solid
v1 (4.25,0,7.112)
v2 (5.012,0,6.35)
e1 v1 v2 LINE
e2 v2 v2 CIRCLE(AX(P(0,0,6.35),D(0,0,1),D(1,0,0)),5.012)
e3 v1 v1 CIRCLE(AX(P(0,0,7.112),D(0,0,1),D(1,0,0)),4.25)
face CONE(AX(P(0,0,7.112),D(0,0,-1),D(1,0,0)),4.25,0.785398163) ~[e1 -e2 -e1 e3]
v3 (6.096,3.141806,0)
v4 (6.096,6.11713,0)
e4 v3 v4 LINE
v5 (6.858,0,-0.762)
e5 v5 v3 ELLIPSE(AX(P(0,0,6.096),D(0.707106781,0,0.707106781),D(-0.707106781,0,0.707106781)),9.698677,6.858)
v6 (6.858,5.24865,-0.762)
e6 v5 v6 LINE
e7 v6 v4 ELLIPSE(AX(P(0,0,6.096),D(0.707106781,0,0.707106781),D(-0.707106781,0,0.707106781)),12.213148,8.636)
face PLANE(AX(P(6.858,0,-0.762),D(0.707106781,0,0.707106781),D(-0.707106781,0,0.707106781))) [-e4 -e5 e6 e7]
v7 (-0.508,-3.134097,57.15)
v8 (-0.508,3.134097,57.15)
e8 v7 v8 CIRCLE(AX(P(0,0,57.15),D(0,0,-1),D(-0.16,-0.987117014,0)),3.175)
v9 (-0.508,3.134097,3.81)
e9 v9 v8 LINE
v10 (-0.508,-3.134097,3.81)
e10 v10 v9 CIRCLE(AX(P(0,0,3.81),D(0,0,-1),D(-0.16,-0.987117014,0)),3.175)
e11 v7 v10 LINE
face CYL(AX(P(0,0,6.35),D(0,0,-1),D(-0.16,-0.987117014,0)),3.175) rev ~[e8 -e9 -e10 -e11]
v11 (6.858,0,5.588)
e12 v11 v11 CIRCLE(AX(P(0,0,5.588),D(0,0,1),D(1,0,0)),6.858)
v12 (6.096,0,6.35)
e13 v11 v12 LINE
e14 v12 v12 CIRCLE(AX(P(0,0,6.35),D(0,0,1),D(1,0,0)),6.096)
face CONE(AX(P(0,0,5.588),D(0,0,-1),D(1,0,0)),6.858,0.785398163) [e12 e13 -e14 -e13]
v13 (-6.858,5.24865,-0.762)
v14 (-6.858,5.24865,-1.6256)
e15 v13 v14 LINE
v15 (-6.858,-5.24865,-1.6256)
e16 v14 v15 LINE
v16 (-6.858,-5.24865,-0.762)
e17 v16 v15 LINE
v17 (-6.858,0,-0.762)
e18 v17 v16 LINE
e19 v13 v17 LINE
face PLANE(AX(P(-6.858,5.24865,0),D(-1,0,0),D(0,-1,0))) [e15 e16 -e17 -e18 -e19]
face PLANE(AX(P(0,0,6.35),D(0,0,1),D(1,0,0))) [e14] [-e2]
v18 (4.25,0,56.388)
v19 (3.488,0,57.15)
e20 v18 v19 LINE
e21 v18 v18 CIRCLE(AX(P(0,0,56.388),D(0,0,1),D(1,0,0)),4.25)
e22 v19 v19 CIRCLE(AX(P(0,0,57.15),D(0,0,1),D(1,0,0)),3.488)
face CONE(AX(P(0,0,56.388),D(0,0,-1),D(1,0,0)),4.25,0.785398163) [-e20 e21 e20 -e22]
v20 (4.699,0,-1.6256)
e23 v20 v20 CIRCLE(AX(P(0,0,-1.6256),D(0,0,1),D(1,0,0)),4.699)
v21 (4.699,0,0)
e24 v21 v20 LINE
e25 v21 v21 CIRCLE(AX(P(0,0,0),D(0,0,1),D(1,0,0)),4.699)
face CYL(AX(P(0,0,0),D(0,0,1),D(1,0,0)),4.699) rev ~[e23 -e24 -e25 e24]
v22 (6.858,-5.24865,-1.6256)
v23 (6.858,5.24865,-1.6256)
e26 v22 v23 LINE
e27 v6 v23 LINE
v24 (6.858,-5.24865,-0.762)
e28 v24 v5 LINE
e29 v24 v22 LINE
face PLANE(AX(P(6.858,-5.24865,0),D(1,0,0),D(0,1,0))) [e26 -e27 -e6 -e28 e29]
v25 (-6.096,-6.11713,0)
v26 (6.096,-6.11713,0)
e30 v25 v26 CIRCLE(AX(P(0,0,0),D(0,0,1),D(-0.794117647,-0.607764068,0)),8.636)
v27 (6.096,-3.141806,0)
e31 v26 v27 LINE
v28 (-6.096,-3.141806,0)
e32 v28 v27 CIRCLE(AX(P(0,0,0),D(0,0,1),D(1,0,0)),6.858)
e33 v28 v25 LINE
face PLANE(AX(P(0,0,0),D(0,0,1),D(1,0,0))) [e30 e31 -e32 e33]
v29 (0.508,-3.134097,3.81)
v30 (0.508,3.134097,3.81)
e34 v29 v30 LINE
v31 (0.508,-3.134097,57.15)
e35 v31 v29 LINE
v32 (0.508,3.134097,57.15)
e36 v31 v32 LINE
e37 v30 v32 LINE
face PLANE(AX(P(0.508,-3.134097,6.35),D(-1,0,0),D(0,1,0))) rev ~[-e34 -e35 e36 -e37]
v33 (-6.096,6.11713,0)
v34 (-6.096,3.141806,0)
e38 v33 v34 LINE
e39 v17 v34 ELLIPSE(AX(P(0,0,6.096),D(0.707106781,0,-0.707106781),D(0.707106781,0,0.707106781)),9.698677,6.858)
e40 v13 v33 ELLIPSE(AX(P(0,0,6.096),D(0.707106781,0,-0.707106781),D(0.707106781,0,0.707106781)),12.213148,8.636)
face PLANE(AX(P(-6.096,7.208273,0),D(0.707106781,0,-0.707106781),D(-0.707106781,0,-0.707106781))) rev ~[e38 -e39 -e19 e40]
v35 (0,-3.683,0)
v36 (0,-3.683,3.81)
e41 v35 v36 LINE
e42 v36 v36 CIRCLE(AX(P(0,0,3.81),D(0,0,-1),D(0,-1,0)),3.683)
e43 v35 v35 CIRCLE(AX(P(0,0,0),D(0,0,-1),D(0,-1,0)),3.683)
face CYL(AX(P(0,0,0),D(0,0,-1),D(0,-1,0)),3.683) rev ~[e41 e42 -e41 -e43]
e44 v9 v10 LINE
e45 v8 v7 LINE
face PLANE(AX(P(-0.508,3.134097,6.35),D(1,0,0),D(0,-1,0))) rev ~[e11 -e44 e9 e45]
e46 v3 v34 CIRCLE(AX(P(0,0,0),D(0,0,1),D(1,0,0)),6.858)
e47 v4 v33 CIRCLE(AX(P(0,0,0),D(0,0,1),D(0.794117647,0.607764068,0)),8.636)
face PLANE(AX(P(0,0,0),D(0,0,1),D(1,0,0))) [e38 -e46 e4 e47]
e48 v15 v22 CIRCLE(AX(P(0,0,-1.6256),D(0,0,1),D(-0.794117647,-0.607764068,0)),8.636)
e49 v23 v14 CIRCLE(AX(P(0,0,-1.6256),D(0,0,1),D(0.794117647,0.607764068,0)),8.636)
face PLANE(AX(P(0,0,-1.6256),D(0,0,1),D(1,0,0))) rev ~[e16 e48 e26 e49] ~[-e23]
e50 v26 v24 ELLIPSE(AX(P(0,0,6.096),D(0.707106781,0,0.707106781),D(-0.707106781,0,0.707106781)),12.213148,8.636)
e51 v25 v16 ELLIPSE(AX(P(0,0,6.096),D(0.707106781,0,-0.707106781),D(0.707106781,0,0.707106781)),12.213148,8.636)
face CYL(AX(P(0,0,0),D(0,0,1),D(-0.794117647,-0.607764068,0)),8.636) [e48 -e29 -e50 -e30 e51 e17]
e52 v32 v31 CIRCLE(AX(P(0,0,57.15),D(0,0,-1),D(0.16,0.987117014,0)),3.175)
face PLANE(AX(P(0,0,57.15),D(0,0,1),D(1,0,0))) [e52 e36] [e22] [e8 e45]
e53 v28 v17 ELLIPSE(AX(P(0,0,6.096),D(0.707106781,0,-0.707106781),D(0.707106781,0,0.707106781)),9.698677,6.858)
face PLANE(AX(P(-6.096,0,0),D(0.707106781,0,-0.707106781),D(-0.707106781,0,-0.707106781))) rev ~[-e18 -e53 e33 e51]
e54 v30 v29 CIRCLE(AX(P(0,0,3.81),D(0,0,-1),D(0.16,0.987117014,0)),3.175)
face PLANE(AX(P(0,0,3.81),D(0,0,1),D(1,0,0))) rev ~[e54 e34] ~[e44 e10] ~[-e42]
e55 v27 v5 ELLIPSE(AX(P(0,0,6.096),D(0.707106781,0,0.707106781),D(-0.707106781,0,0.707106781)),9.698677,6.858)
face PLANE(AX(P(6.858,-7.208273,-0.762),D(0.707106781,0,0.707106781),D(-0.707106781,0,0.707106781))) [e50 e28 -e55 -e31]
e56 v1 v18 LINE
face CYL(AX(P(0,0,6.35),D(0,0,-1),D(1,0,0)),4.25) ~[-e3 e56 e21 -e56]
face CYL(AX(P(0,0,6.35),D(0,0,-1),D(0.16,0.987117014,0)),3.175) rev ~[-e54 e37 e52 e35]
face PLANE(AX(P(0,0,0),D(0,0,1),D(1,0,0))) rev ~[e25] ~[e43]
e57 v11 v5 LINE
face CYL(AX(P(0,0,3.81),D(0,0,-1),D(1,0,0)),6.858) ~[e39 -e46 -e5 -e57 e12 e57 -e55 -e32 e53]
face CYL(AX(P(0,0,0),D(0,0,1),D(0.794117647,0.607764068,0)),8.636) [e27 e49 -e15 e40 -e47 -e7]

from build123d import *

# Parameters (mm, degrees)
F0_R         = 4.699
F1_DEPTH     = 1.6256
F3_DEPTH     = 3.81
F4_R         = 6.858
F5_DEPTH     = 2.54
F6_R         = 4.25
F7_DEPTH     = 50.8
F8_T8_DEPTH  = 7.2082729301
F8_S9_R      = 6.858
F8_T10_DEPTH = 5
F8_T14_DEPTH = 7.2082729301
F8_S15_R     = 6.858
F8_T16_DEPTH = 5
F8_T22_DEPTH = 7.2082729301
F8_S23_R     = 6.858
F8_T24_DEPTH = 5
F8_T28_DEPTH = 7.2082729301
F8_S29_R     = 6.858
F8_T30_DEPTH = 5


# Not quite as in the source:
# - a fillet or chamfer that OpenCascade refuses, or shapes differently, is made with other operations: its cross-section is extruded or revolved along the edge and cut away or added


with BuildPart() as f1:
    # F0 (on Top) → F1 (new body)
    with BuildSketch(Plane.XY):
        with BuildLine():
            Line((6.858, -5.2486504932), (6.858, 5.2486504932))
            ThreePointArc((6.858, 5.2486504932), (0, 8.636), (-6.858, 5.2486504932))
            Line((-6.858, 5.2486504932), (-6.858, -5.2486504932))
            ThreePointArc((-6.858, -5.2486504932), (0, -8.636), (6.858, -5.2486504932))
        make_face()
        Circle(F0_R, mode=Mode.SUBTRACT)
    extrude(amount=-F1_DEPTH)

    # F2 (on face) → F3 (join)
    with BuildSketch(Plane.XY):
        with BuildLine():
            ThreePointArc((-6.858, 0), (0, -6.858), (6.858, 0))
            ThreePointArc((6.858, 0), (0, 6.858), (-6.858, 0))
        make_face()
        with BuildLine():
            ThreePointArc((0, 3.683), (3.683, 0), (0, -3.683))
            ThreePointArc((0, -3.683), (-3.683, 0), (0, 3.683))
        make_face(mode=Mode.SUBTRACT)
    extrude(amount=F3_DEPTH)

    # F4 (on face) → F5 (join)
    with BuildSketch(Plane.XY.offset(3.81)):
        Circle(F4_R)
        with BuildLine():
            Line((-0.508, 3.1340965205), (-0.508, -3.1340965205))
            ThreePointArc((-0.508, -3.1340965205), (-3.175, 0), (-0.508, 3.1340965205))
        make_face(mode=Mode.SUBTRACT)
        with BuildLine():
            ThreePointArc((0.508, 3.1340965205), (3.175, 0), (0.508, -3.1340965205))
            Line((0.508, -3.1340965205), (0.508, 3.1340965205))
        make_face(mode=Mode.SUBTRACT)
    extrude(amount=F5_DEPTH)

    # F6 (on face) → F7 (join)
    with BuildSketch(Plane.XY.offset(6.35)):
        Circle(F6_R)
        with BuildLine():
            Line((-0.508, 3.1340965205), (-0.508, -3.1340965205))
            ThreePointArc((-0.508, -3.1340965205), (-3.175, 0), (-0.508, 3.1340965205))
        make_face(mode=Mode.SUBTRACT)
        with BuildLine():
            ThreePointArc((0.508, 3.1340965205), (3.175, 0), (0.508, -3.1340965205))
            Line((0.508, -3.1340965205), (0.508, 3.1340965205))
        make_face(mode=Mode.SUBTRACT)
    extrude(amount=F7_DEPTH)

    # F8: chamfer of 0.762 on 5 edges, made by hand

    # F8_s1 → F8_t2 (revolve)
    with BuildSketch(Plane.XZ):
        Polygon((4.25, 7.112), (5.012, 6.35), (4.25, 6.35), align=None)
    revolve(axis=Axis((0, 0, 6.35), (0, 0, 1)))

    # F8_s3 → F8_t4 (revolve, cut)
    with BuildSketch(Plane.XZ):
        Polygon((6.858, 5.588), (6.096, 6.35), (6.858, 6.35), align=None)
    revolve(axis=Axis((0, 0, 6.35), (0, 0, 1)), mode=Mode.SUBTRACT)


with BuildPart() as f8_tool6:
    # F8_s7 → F8_t8 (new body)
    with BuildSketch(Plane.XZ.offset(-7.2082729301)):
        Polygon((-6.096, 0), (-6.858, -0.762), (-6.858, 0), align=None)
    extrude(amount=F8_T8_DEPTH)

    # F8_s9 → F8_t10 (cut, symmetric)
    with BuildSketch(Plane.XY.offset(-0.4)):
        Circle(F8_S9_R)
    extrude(amount=F8_T10_DEPTH, both=True, mode=Mode.SUBTRACT)


with BuildPart() as f1_1:
    add(f1.part)

    # F8_t5: cut F8_tool6
    add(f8_tool6.part, mode=Mode.SUBTRACT)


with BuildPart() as f8_tool12:
    # F8_s13 → F8_t14 (new body)
    with BuildSketch(Plane.XZ):
        Polygon((6.858, -0.762), (6.096, 0), (6.858, 0), align=None)
    extrude(amount=-F8_T14_DEPTH)

    # F8_s15 → F8_t16 (cut, symmetric)
    with BuildSketch(Plane.XY.offset(-0.4)):
        Circle(F8_S15_R)
    extrude(amount=F8_T16_DEPTH, both=True, mode=Mode.SUBTRACT)


with BuildPart() as f1_2:
    add(f1_1.part)

    # F8_t11: cut F8_tool12
    add(f8_tool12.part, mode=Mode.SUBTRACT)

    # F8_s17 → F8_t18 (revolve, cut)
    with BuildSketch(Plane.XZ):
        Polygon((4.25, 56.388), (3.488, 57.15), (4.25, 57.15), align=None)
    revolve(axis=Axis((0, 0, 57.15), (0, 0, 1)), mode=Mode.SUBTRACT)


with BuildPart() as f8_tool20:
    # F8_s21 → F8_t22 (new body)
    with BuildSketch(Plane.XZ.offset(7.2082729301)):
        Polygon((6.858, -0.762), (6.096, 0), (6.858, 0), align=None)
    extrude(amount=-F8_T22_DEPTH)

    # F8_s23 → F8_t24 (cut, symmetric)
    with BuildSketch(Plane.XY.offset(-0.4)):
        Circle(F8_S23_R)
    extrude(amount=F8_T24_DEPTH, both=True, mode=Mode.SUBTRACT)


with BuildPart() as f1_3:
    add(f1_2.part)

    # F8_t19: cut F8_tool20
    add(f8_tool20.part, mode=Mode.SUBTRACT)


with BuildPart() as f8_tool26:
    # F8_s27 → F8_t28 (new body)
    with BuildSketch(Plane.XZ):
        Polygon((-6.096, 0), (-6.858, -0.762), (-6.858, 0), align=None)
    extrude(amount=F8_T28_DEPTH)

    # F8_s29 → F8_t30 (cut, symmetric)
    with BuildSketch(Plane.XY.offset(-0.4)):
        Circle(F8_S29_R)
    extrude(amount=F8_T30_DEPTH, both=True, mode=Mode.SUBTRACT)


with BuildPart() as f1_4:
    add(f1_3.part)

    # F8_t25: cut F8_tool26
    add(f8_tool26.part, mode=Mode.SUBTRACT)


solid = f1_4.part
